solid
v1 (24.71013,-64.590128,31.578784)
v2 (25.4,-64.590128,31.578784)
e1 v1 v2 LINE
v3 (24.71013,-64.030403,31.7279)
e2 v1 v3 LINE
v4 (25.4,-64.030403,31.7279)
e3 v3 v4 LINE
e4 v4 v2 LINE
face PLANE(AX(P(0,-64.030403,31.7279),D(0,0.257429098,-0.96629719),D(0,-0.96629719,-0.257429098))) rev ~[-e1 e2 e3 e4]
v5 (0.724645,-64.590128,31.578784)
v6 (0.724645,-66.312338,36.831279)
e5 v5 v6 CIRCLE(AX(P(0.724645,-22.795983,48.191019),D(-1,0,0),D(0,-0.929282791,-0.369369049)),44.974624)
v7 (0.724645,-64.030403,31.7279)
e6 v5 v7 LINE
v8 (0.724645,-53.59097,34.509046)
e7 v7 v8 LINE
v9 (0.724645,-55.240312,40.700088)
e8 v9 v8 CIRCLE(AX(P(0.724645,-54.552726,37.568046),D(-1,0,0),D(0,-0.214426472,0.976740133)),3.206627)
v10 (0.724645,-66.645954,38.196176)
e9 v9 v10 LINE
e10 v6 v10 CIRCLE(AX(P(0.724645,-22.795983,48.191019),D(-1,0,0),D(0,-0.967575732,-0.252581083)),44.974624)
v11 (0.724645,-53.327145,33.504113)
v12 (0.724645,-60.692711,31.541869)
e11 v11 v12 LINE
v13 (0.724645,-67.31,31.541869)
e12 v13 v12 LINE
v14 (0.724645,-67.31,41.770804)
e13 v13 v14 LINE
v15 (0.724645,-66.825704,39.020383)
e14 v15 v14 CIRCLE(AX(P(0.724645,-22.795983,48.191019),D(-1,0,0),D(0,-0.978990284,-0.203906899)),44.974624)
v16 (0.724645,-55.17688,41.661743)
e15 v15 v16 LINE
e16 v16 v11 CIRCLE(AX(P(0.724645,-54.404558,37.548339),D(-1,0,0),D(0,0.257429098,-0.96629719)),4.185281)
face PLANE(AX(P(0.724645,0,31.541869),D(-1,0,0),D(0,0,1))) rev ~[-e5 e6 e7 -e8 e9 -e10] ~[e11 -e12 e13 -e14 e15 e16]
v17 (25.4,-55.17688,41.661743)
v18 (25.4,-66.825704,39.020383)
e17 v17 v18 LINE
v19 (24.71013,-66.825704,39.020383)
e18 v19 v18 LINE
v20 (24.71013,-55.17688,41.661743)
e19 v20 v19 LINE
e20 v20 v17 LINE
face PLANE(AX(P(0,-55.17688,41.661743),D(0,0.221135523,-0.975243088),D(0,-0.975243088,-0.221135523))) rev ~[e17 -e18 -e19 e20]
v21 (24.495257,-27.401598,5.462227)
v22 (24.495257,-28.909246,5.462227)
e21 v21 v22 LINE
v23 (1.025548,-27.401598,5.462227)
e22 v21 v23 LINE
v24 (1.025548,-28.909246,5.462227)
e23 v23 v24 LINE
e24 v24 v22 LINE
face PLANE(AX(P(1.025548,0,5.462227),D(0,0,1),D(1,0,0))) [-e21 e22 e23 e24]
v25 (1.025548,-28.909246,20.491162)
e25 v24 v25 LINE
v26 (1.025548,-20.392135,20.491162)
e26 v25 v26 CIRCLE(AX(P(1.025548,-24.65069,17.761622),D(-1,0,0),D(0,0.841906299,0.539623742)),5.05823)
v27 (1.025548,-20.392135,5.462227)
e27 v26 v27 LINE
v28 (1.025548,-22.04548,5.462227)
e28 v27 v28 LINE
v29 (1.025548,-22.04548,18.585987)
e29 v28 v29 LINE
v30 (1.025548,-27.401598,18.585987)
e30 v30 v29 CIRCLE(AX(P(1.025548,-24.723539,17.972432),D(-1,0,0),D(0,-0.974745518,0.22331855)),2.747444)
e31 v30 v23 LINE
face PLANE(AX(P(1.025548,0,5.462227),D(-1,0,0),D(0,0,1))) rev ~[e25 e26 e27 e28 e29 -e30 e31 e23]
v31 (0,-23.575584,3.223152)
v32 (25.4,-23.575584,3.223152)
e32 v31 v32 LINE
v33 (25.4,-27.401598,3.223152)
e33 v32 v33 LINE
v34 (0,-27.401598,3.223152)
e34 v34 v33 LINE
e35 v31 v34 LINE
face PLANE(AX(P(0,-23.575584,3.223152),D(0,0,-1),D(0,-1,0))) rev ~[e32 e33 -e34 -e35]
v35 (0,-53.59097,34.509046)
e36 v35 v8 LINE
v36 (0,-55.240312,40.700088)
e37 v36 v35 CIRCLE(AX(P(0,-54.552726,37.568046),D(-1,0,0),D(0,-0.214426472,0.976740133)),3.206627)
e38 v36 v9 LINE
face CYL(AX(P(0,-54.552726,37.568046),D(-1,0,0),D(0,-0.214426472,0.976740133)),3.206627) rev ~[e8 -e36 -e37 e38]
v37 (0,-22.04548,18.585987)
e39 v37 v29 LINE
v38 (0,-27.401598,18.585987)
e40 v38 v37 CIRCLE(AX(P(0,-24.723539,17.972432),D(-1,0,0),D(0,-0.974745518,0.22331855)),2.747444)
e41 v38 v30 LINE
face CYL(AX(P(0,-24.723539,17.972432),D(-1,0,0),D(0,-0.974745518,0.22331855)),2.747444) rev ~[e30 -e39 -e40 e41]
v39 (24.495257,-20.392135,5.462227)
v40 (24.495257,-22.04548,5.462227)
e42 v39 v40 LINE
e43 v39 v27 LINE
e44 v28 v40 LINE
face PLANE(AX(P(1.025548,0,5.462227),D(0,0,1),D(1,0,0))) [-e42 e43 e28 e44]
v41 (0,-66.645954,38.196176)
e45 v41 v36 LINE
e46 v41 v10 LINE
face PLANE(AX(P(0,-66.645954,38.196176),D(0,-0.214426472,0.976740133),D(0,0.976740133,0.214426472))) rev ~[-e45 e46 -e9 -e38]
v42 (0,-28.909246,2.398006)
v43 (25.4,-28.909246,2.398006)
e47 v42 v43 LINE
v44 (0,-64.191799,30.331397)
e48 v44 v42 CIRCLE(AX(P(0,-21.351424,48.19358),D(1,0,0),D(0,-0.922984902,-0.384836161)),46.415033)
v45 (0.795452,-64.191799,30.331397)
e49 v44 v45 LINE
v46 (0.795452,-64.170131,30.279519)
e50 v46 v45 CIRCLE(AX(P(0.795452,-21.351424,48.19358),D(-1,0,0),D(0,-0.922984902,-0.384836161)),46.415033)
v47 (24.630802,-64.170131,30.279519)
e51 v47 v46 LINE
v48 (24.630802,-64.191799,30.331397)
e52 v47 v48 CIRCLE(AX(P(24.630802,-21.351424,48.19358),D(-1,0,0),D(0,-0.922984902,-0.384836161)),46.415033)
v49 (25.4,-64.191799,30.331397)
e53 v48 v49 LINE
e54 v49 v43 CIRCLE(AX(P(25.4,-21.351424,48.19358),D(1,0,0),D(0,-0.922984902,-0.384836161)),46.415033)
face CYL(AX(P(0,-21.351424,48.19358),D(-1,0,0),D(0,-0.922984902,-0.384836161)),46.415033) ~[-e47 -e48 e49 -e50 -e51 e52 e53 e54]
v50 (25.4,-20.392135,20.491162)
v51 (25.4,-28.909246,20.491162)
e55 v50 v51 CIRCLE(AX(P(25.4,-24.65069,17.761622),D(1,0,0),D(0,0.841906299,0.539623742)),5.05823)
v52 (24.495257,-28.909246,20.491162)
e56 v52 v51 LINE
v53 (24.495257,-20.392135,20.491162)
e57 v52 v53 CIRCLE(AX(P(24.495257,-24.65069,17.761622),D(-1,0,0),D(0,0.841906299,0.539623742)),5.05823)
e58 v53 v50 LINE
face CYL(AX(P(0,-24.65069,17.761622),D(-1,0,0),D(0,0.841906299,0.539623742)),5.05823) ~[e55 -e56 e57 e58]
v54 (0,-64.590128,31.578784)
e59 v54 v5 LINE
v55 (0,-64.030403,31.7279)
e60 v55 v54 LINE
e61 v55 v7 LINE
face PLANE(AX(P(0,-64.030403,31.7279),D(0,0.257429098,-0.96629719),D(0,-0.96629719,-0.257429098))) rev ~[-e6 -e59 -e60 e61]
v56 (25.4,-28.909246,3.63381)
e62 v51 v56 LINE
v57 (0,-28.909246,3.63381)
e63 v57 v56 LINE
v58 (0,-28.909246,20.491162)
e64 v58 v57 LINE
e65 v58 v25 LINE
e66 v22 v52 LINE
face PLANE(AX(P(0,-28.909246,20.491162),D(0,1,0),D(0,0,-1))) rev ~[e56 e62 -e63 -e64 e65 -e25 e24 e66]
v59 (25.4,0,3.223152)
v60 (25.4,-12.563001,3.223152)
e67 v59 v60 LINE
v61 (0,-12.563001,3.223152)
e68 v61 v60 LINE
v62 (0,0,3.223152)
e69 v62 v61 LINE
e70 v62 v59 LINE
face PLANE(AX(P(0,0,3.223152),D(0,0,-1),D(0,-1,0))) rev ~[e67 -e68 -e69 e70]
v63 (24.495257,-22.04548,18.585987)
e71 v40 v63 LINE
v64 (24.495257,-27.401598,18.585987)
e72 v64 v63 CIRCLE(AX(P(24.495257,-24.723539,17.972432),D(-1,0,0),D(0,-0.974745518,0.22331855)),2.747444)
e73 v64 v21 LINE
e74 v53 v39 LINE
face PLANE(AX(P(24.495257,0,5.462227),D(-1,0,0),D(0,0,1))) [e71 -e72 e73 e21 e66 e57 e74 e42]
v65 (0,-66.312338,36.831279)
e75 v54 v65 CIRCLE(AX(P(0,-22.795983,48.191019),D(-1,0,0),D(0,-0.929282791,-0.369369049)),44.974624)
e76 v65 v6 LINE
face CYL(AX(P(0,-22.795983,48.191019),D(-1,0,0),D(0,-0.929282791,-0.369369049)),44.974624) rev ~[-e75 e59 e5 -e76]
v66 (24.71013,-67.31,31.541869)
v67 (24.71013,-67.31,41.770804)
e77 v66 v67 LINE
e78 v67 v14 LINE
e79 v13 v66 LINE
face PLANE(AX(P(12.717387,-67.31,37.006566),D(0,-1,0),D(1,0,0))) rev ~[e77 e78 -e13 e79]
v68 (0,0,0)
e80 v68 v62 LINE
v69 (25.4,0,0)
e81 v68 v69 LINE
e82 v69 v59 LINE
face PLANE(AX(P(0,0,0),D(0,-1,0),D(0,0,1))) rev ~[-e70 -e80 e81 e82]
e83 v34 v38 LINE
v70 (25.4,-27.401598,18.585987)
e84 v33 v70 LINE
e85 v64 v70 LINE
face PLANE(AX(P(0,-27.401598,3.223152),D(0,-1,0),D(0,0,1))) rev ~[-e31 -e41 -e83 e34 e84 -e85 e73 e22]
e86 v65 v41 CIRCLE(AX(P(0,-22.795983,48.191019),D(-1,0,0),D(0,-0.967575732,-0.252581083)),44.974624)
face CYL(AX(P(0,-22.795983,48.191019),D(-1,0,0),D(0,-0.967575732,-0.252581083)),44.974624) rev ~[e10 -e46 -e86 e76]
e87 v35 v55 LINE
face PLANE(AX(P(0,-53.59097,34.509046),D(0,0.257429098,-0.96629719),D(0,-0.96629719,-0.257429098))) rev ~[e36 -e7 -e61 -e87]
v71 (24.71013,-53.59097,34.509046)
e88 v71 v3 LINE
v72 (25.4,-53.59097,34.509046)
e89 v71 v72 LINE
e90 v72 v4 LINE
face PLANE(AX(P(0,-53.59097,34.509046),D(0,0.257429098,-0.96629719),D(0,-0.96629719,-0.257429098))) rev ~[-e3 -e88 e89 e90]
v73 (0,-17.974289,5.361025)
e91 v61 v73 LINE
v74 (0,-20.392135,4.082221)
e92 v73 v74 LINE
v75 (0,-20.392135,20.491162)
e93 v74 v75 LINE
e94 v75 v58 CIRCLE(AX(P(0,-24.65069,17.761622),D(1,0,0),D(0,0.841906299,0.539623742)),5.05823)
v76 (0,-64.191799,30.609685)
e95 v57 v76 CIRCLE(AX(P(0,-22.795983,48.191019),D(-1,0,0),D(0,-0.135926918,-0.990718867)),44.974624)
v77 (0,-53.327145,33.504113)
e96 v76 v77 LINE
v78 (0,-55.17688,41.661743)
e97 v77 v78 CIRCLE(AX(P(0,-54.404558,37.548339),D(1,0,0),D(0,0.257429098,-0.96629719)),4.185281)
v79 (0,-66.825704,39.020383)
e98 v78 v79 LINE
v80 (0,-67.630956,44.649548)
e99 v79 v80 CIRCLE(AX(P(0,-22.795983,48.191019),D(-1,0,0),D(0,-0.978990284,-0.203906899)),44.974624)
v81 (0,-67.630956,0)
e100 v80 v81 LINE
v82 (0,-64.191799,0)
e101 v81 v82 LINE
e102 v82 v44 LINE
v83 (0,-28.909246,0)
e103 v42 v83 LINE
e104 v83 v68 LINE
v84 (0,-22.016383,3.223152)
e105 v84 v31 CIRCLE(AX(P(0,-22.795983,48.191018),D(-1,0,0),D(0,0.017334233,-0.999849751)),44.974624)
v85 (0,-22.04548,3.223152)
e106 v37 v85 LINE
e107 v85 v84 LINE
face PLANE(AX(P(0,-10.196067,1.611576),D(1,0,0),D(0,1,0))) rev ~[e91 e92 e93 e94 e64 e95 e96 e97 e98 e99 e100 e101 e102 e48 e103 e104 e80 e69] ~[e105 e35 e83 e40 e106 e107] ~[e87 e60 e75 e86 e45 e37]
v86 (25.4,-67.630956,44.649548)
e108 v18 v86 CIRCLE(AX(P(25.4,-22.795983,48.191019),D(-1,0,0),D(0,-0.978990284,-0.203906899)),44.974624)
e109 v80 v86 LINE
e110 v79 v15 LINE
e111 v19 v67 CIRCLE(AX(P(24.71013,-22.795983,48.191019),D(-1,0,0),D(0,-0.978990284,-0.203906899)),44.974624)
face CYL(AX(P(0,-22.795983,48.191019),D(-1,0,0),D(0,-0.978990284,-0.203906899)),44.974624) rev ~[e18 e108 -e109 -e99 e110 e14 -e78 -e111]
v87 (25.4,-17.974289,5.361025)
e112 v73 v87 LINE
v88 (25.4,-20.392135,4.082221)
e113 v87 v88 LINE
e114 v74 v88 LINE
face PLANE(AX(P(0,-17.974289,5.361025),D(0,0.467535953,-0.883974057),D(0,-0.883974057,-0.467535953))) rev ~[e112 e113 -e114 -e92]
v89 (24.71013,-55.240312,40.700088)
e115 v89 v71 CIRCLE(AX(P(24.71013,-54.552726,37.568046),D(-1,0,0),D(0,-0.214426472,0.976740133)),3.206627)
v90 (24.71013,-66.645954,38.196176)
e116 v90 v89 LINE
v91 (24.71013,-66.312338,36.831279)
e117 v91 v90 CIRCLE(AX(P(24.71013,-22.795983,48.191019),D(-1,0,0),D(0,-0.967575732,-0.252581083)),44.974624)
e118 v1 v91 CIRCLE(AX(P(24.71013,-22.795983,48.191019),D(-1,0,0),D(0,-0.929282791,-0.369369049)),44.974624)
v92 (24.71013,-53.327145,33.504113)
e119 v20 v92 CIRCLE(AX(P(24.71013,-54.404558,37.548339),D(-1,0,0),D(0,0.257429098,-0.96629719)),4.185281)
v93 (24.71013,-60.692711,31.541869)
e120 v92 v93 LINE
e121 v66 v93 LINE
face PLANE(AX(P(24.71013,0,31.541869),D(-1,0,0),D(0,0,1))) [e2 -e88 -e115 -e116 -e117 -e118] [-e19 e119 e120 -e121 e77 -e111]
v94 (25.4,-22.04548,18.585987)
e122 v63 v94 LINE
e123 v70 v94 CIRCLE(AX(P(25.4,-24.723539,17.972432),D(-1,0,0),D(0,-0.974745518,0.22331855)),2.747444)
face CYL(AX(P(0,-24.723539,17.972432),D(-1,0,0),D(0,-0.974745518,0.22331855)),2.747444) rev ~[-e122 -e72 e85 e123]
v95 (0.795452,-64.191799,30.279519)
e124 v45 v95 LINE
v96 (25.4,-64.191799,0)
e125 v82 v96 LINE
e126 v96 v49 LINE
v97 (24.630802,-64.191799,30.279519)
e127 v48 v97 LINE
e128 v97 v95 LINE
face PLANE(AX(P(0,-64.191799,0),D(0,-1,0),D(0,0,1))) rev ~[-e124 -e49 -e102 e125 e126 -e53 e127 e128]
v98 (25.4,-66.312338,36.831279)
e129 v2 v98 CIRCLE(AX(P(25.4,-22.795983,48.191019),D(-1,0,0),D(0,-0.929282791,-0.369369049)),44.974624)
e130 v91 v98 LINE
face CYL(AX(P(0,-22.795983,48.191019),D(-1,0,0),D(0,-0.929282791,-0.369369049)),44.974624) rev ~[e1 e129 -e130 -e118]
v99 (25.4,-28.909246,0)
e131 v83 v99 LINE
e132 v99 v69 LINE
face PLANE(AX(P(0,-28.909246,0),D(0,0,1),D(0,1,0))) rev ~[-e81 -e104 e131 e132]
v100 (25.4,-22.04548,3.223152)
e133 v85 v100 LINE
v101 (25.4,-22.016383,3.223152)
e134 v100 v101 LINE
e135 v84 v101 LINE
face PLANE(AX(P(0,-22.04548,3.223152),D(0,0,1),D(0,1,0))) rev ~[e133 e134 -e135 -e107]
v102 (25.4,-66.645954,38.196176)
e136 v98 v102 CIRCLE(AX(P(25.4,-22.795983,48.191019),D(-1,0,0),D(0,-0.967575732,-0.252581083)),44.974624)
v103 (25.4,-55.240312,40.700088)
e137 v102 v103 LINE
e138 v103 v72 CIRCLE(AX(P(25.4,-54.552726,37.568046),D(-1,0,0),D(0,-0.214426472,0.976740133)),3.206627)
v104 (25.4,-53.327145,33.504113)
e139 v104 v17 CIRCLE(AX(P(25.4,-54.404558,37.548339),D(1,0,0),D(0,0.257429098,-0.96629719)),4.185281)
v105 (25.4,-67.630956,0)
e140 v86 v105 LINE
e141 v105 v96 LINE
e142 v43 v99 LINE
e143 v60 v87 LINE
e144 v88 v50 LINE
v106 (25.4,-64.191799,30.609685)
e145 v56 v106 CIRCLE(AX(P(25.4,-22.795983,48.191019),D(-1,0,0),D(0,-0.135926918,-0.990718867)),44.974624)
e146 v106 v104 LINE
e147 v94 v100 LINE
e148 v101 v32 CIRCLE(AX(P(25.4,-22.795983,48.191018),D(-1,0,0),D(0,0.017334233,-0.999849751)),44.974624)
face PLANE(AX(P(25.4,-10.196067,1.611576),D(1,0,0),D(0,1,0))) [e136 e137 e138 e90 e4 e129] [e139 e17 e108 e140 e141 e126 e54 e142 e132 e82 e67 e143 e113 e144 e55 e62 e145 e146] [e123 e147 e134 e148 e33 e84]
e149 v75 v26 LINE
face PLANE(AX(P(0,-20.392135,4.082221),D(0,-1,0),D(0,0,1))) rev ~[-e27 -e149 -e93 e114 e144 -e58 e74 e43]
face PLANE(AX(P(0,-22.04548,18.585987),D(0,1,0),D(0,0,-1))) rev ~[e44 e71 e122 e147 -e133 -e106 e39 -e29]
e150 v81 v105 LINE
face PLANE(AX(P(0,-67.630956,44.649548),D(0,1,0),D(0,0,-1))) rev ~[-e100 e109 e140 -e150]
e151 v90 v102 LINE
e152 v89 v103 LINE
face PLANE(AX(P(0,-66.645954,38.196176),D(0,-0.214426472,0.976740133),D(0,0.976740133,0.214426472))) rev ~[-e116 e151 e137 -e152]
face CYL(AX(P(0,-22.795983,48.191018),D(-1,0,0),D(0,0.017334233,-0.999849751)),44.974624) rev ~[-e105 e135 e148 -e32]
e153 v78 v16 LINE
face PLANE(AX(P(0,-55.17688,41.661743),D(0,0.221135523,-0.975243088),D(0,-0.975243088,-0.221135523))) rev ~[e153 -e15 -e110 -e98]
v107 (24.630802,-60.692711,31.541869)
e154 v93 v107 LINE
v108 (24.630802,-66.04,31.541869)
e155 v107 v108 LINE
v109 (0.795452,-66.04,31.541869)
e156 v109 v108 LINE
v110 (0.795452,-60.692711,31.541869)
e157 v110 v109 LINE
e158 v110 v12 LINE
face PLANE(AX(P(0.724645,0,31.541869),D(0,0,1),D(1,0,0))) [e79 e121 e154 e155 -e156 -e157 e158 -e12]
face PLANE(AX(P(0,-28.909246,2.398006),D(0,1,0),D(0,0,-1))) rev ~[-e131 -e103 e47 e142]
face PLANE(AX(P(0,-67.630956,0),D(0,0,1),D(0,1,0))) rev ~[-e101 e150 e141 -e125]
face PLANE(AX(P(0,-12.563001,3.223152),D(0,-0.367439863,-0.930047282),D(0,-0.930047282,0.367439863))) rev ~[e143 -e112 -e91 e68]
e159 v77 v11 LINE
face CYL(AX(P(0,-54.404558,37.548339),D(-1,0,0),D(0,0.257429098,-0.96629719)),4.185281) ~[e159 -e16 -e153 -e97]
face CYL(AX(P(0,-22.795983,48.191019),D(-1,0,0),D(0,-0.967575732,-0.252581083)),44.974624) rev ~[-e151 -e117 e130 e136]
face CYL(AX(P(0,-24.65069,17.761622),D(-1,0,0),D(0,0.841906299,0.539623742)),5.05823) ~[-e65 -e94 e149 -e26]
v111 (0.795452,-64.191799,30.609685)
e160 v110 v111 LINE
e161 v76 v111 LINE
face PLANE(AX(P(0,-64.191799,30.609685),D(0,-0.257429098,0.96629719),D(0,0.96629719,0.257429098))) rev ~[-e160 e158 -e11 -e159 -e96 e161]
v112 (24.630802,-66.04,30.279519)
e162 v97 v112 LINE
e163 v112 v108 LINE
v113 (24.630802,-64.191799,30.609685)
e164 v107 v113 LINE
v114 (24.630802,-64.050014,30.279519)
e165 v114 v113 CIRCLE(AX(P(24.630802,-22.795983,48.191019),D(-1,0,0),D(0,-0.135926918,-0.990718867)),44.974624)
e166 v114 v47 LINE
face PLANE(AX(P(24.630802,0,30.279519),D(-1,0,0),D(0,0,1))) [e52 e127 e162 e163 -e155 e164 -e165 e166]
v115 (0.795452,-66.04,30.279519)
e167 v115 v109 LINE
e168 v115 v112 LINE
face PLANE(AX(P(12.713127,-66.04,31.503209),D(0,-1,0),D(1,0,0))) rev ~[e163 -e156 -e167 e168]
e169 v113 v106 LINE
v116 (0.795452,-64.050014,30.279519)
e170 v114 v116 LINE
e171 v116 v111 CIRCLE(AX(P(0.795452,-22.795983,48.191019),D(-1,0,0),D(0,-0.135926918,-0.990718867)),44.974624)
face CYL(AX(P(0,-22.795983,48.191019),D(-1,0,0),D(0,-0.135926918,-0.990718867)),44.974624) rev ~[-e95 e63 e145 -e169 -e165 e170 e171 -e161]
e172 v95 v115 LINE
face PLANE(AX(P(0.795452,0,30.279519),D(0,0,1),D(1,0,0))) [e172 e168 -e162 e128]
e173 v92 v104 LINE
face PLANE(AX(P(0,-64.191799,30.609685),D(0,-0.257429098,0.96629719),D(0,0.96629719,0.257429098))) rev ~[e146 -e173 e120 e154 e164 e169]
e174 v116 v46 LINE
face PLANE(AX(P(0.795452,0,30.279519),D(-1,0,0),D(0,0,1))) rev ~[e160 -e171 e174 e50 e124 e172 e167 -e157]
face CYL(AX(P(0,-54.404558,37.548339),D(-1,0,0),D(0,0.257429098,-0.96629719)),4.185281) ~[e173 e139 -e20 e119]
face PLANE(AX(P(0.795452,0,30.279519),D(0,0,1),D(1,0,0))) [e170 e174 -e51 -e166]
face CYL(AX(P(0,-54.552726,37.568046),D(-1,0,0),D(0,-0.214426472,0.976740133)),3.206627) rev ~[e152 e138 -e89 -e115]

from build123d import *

# Parameters (mm, degrees)
F1_DEPTH = 25.4
F2_W     = 23.985484906
F2_H     = 10.9293945134
F3_DEPTH = 63.5
F4_DEPTH = 67.31
F5_W     = 23.835350119
F5_H     = 2.447379753
F6_DEPTH = 66.04
F7_W     = 23.4697095584
F7_H     = 17.8560893983
F8_DEPTH = 34.29


# Not quite as in the source:
# - the program builds the solid bodies; features that only make, move or delete a surface that nothing else refers to are left out


with BuildPart() as f1:
    # F0 (on Right) → F1 (new body)
    with BuildSketch(Plane.YZ):
        Polygon((0, 0), (0, 3.2231518999), (-12.5630013645, 3.2231518999), (-20.3921347857, 3.2231518999), (-20.3921347857, 0), align=None)
        Polygon((-20.3921347857, 3.2231518999), (-12.5630013645, 3.2231518999), (-17.9742891341, 5.361024756), (-20.3921347857, 4.0822205165), align=None)
        with BuildLine():
            Line((-20.3921347857, 0), (-20.3921347857, 3.2231518999))
            Line((-20.3921347857, 3.2231518999), (-22.0163828564, 3.2231518999))
            ThreePointArc((-22.0163828564, 3.2231518999), (-22.7959834692, 3.2163945029), (-23.575584082, 3.2231518999))
            Line((-23.575584082, 3.2231518999), (-27.4015981704, 3.2231518999))
            Line((-27.4015981704, 3.2231518999), (-28.9092455059, 3.2231518999))
            Line((-28.9092455059, 3.2231518999), (-28.9092455059, 2.3980058104))
            Line((-28.9092455059, 2.3980058104), (-28.9092455059, 0))
            Line((-28.9092455059, 0), (-20.3921347857, 0))
        make_face()
        Polygon((-22.0163828564, 3.2231518999), (-20.3921347857, 3.2231518999), (-20.3921347857, 4.0822205165), align=None)
        with BuildLine():
            Line((-22.0454800874, 3.2231518999), (-22.0163828564, 3.2231518999))
            Line((-22.0163828564, 3.2231518999), (-20.3921347857, 4.0822205165))
            Line((-20.3921347857, 4.0822205165), (-20.3921347857, 20.491162315))
            ThreePointArc((-20.3921347857, 20.491162315), (-24.6506901458, 22.8198511271), (-28.9092455059, 20.491162315))
            Line((-28.9092455059, 20.491162315), (-28.9092455059, 3.6338099802))
            ThreePointArc((-28.9092455059, 3.6338099802), (-28.1561856735, 3.5369589297), (-27.4015981704, 3.4528343954))
            Line((-27.4015981704, 3.4528343954), (-27.4015981704, 18.5859873891))
            ThreePointArc((-27.4015981704, 18.5859873891), (-24.7235391289, 20.7198764309), (-22.0454800874, 18.5859873891))
            Line((-22.0454800874, 18.5859873891), (-22.0454800874, 3.2231518999))
        make_face()
        with BuildLine():
            ThreePointArc((-64.1917986715, 30.3313969183), (-50.16224019, 11.8027548597), (-28.9092455059, 2.3980058104))
            Line((-28.9092455059, 2.3980058104), (-28.9092455059, 3.2231518999))
            Line((-28.9092455059, 3.2231518999), (-28.9092455059, 3.6338099802))
            ThreePointArc((-28.9092455059, 3.6338099802), (-50.1126919116, 12.4626789581), (-64.1917986715, 30.6096847649))
            Line((-64.1917986715, 30.6096847649), (-64.1917986715, 30.3313969183))
        make_face()
        with BuildLine():
            Line((-28.9092455059, 3.2231518999), (-27.4015981704, 3.2231518999))
            Line((-27.4015981704, 3.2231518999), (-27.4015981704, 3.4528343954))
            ThreePointArc((-27.4015981704, 3.4528343954), (-28.1561856735, 3.5369589297), (-28.9092455059, 3.6338099802))
            Line((-28.9092455059, 3.6338099802), (-28.9092455059, 3.2231518999))
        make_face()
        with BuildLine():
            ThreePointArc((-67.6309564566, 44.6495479383), (-66.4828080231, 37.35321731), (-64.1917986715, 30.3313969183))
            Line((-64.1917986715, 30.3313969183), (-64.1917986715, 30.6096847649))
            ThreePointArc((-64.1917986715, 30.6096847649), (-64.3937854186, 31.0930746092), (-64.59012772, 31.5787844899))
            ThreePointArc((-64.59012772, 31.5787844899), (-65.5320044676, 34.1785482504), (-66.3123383407, 36.8312793835))
            ThreePointArc((-66.3123383407, 36.8312793835), (-66.4844767509, 37.5124245346), (-66.645954144, 38.1961755131))
            ThreePointArc((-66.645954144, 38.1961755131), (-66.7377613235, 38.6078575578), (-66.8257035474, 39.0203825019))
            ThreePointArc((-66.8257035474, 39.0203825019), (-67.3173861233, 41.8222257294), (-67.6309564566, 44.6495479383))
        make_face()
        with BuildLine():
            Line((-64.1917986715, 0), (-64.1917986715, 30.3313969183))
            ThreePointArc((-64.1917986715, 30.3313969183), (-66.4828080231, 37.35321731), (-67.6309564566, 44.6495479383))
            Line((-67.6309564566, 44.6495479383), (-67.6309564566, 0))
            Line((-67.6309564566, 0), (-64.1917986715, 0))
        make_face()
        with BuildLine():
            ThreePointArc((-64.59012772, 31.5787844899), (-64.3937854186, 31.0930746092), (-64.1917986715, 30.6096847649))
            Line((-64.1917986715, 30.6096847649), (-64.0304028831, 31.7278995465))
            Line((-64.0304028831, 31.7278995465), (-64.59012772, 31.5787844899))
        make_face()
        with BuildLine():
            Line((-64.0304028831, 31.7278995465), (-64.1917986715, 30.6096847649))
            Line((-64.1917986715, 30.6096847649), (-53.3271447245, 33.5041132079))
            ThreePointArc((-53.3271447245, 33.5041132079), (-50.3228913796, 38.4738529349), (-55.1768802106, 41.6617430747))
            Line((-55.1768802106, 41.6617430747), (-66.8257035474, 39.0203825019))
            ThreePointArc((-66.8257035474, 39.0203825019), (-66.7377613235, 38.6078575578), (-66.645954144, 38.1961755131))
            Line((-66.645954144, 38.1961755131), (-55.2403122474, 40.7000877275))
            ThreePointArc((-55.2403122474, 40.7000877275), (-51.4541715224, 38.3935253272), (-53.5909704186, 34.5090456743))
            Line((-53.5909704186, 34.5090456743), (-64.0304028831, 31.7278995465))
        make_face()
    extrude(amount=F1_DEPTH)

    # F2 (on Front) → F3 (cut)
    with BuildSketch(Plane.XZ):
        with Locations((12.7173874935, 37.006566301)):
            Rectangle(F2_W, F2_H)
    extrude(amount=F3_DEPTH, mode=Mode.SUBTRACT)

    # F2 (on Front) → F4 (cut)
    with BuildSketch(Plane.XZ):
        with Locations((12.7173874935, 37.006566301)):
            Rectangle(F2_W, F2_H)
    extrude(amount=F4_DEPTH, mode=Mode.SUBTRACT)

    # F5 (on Front) → F6 (cut)
    with BuildSketch(Plane.XZ):
        with Locations((12.7131266927, 31.5032089129)):
            Rectangle(F5_W, F5_H)
    extrude(amount=F6_DEPTH, mode=Mode.SUBTRACT)

    # F7 (on Front) → F8 (cut)
    with BuildSketch(Plane.XZ):
        with Locations((12.7604022855, 14.3902720883)):
            Rectangle(F7_W, F7_H)
    extrude(amount=F8_DEPTH, mode=Mode.SUBTRACT)


solid = f1.part
